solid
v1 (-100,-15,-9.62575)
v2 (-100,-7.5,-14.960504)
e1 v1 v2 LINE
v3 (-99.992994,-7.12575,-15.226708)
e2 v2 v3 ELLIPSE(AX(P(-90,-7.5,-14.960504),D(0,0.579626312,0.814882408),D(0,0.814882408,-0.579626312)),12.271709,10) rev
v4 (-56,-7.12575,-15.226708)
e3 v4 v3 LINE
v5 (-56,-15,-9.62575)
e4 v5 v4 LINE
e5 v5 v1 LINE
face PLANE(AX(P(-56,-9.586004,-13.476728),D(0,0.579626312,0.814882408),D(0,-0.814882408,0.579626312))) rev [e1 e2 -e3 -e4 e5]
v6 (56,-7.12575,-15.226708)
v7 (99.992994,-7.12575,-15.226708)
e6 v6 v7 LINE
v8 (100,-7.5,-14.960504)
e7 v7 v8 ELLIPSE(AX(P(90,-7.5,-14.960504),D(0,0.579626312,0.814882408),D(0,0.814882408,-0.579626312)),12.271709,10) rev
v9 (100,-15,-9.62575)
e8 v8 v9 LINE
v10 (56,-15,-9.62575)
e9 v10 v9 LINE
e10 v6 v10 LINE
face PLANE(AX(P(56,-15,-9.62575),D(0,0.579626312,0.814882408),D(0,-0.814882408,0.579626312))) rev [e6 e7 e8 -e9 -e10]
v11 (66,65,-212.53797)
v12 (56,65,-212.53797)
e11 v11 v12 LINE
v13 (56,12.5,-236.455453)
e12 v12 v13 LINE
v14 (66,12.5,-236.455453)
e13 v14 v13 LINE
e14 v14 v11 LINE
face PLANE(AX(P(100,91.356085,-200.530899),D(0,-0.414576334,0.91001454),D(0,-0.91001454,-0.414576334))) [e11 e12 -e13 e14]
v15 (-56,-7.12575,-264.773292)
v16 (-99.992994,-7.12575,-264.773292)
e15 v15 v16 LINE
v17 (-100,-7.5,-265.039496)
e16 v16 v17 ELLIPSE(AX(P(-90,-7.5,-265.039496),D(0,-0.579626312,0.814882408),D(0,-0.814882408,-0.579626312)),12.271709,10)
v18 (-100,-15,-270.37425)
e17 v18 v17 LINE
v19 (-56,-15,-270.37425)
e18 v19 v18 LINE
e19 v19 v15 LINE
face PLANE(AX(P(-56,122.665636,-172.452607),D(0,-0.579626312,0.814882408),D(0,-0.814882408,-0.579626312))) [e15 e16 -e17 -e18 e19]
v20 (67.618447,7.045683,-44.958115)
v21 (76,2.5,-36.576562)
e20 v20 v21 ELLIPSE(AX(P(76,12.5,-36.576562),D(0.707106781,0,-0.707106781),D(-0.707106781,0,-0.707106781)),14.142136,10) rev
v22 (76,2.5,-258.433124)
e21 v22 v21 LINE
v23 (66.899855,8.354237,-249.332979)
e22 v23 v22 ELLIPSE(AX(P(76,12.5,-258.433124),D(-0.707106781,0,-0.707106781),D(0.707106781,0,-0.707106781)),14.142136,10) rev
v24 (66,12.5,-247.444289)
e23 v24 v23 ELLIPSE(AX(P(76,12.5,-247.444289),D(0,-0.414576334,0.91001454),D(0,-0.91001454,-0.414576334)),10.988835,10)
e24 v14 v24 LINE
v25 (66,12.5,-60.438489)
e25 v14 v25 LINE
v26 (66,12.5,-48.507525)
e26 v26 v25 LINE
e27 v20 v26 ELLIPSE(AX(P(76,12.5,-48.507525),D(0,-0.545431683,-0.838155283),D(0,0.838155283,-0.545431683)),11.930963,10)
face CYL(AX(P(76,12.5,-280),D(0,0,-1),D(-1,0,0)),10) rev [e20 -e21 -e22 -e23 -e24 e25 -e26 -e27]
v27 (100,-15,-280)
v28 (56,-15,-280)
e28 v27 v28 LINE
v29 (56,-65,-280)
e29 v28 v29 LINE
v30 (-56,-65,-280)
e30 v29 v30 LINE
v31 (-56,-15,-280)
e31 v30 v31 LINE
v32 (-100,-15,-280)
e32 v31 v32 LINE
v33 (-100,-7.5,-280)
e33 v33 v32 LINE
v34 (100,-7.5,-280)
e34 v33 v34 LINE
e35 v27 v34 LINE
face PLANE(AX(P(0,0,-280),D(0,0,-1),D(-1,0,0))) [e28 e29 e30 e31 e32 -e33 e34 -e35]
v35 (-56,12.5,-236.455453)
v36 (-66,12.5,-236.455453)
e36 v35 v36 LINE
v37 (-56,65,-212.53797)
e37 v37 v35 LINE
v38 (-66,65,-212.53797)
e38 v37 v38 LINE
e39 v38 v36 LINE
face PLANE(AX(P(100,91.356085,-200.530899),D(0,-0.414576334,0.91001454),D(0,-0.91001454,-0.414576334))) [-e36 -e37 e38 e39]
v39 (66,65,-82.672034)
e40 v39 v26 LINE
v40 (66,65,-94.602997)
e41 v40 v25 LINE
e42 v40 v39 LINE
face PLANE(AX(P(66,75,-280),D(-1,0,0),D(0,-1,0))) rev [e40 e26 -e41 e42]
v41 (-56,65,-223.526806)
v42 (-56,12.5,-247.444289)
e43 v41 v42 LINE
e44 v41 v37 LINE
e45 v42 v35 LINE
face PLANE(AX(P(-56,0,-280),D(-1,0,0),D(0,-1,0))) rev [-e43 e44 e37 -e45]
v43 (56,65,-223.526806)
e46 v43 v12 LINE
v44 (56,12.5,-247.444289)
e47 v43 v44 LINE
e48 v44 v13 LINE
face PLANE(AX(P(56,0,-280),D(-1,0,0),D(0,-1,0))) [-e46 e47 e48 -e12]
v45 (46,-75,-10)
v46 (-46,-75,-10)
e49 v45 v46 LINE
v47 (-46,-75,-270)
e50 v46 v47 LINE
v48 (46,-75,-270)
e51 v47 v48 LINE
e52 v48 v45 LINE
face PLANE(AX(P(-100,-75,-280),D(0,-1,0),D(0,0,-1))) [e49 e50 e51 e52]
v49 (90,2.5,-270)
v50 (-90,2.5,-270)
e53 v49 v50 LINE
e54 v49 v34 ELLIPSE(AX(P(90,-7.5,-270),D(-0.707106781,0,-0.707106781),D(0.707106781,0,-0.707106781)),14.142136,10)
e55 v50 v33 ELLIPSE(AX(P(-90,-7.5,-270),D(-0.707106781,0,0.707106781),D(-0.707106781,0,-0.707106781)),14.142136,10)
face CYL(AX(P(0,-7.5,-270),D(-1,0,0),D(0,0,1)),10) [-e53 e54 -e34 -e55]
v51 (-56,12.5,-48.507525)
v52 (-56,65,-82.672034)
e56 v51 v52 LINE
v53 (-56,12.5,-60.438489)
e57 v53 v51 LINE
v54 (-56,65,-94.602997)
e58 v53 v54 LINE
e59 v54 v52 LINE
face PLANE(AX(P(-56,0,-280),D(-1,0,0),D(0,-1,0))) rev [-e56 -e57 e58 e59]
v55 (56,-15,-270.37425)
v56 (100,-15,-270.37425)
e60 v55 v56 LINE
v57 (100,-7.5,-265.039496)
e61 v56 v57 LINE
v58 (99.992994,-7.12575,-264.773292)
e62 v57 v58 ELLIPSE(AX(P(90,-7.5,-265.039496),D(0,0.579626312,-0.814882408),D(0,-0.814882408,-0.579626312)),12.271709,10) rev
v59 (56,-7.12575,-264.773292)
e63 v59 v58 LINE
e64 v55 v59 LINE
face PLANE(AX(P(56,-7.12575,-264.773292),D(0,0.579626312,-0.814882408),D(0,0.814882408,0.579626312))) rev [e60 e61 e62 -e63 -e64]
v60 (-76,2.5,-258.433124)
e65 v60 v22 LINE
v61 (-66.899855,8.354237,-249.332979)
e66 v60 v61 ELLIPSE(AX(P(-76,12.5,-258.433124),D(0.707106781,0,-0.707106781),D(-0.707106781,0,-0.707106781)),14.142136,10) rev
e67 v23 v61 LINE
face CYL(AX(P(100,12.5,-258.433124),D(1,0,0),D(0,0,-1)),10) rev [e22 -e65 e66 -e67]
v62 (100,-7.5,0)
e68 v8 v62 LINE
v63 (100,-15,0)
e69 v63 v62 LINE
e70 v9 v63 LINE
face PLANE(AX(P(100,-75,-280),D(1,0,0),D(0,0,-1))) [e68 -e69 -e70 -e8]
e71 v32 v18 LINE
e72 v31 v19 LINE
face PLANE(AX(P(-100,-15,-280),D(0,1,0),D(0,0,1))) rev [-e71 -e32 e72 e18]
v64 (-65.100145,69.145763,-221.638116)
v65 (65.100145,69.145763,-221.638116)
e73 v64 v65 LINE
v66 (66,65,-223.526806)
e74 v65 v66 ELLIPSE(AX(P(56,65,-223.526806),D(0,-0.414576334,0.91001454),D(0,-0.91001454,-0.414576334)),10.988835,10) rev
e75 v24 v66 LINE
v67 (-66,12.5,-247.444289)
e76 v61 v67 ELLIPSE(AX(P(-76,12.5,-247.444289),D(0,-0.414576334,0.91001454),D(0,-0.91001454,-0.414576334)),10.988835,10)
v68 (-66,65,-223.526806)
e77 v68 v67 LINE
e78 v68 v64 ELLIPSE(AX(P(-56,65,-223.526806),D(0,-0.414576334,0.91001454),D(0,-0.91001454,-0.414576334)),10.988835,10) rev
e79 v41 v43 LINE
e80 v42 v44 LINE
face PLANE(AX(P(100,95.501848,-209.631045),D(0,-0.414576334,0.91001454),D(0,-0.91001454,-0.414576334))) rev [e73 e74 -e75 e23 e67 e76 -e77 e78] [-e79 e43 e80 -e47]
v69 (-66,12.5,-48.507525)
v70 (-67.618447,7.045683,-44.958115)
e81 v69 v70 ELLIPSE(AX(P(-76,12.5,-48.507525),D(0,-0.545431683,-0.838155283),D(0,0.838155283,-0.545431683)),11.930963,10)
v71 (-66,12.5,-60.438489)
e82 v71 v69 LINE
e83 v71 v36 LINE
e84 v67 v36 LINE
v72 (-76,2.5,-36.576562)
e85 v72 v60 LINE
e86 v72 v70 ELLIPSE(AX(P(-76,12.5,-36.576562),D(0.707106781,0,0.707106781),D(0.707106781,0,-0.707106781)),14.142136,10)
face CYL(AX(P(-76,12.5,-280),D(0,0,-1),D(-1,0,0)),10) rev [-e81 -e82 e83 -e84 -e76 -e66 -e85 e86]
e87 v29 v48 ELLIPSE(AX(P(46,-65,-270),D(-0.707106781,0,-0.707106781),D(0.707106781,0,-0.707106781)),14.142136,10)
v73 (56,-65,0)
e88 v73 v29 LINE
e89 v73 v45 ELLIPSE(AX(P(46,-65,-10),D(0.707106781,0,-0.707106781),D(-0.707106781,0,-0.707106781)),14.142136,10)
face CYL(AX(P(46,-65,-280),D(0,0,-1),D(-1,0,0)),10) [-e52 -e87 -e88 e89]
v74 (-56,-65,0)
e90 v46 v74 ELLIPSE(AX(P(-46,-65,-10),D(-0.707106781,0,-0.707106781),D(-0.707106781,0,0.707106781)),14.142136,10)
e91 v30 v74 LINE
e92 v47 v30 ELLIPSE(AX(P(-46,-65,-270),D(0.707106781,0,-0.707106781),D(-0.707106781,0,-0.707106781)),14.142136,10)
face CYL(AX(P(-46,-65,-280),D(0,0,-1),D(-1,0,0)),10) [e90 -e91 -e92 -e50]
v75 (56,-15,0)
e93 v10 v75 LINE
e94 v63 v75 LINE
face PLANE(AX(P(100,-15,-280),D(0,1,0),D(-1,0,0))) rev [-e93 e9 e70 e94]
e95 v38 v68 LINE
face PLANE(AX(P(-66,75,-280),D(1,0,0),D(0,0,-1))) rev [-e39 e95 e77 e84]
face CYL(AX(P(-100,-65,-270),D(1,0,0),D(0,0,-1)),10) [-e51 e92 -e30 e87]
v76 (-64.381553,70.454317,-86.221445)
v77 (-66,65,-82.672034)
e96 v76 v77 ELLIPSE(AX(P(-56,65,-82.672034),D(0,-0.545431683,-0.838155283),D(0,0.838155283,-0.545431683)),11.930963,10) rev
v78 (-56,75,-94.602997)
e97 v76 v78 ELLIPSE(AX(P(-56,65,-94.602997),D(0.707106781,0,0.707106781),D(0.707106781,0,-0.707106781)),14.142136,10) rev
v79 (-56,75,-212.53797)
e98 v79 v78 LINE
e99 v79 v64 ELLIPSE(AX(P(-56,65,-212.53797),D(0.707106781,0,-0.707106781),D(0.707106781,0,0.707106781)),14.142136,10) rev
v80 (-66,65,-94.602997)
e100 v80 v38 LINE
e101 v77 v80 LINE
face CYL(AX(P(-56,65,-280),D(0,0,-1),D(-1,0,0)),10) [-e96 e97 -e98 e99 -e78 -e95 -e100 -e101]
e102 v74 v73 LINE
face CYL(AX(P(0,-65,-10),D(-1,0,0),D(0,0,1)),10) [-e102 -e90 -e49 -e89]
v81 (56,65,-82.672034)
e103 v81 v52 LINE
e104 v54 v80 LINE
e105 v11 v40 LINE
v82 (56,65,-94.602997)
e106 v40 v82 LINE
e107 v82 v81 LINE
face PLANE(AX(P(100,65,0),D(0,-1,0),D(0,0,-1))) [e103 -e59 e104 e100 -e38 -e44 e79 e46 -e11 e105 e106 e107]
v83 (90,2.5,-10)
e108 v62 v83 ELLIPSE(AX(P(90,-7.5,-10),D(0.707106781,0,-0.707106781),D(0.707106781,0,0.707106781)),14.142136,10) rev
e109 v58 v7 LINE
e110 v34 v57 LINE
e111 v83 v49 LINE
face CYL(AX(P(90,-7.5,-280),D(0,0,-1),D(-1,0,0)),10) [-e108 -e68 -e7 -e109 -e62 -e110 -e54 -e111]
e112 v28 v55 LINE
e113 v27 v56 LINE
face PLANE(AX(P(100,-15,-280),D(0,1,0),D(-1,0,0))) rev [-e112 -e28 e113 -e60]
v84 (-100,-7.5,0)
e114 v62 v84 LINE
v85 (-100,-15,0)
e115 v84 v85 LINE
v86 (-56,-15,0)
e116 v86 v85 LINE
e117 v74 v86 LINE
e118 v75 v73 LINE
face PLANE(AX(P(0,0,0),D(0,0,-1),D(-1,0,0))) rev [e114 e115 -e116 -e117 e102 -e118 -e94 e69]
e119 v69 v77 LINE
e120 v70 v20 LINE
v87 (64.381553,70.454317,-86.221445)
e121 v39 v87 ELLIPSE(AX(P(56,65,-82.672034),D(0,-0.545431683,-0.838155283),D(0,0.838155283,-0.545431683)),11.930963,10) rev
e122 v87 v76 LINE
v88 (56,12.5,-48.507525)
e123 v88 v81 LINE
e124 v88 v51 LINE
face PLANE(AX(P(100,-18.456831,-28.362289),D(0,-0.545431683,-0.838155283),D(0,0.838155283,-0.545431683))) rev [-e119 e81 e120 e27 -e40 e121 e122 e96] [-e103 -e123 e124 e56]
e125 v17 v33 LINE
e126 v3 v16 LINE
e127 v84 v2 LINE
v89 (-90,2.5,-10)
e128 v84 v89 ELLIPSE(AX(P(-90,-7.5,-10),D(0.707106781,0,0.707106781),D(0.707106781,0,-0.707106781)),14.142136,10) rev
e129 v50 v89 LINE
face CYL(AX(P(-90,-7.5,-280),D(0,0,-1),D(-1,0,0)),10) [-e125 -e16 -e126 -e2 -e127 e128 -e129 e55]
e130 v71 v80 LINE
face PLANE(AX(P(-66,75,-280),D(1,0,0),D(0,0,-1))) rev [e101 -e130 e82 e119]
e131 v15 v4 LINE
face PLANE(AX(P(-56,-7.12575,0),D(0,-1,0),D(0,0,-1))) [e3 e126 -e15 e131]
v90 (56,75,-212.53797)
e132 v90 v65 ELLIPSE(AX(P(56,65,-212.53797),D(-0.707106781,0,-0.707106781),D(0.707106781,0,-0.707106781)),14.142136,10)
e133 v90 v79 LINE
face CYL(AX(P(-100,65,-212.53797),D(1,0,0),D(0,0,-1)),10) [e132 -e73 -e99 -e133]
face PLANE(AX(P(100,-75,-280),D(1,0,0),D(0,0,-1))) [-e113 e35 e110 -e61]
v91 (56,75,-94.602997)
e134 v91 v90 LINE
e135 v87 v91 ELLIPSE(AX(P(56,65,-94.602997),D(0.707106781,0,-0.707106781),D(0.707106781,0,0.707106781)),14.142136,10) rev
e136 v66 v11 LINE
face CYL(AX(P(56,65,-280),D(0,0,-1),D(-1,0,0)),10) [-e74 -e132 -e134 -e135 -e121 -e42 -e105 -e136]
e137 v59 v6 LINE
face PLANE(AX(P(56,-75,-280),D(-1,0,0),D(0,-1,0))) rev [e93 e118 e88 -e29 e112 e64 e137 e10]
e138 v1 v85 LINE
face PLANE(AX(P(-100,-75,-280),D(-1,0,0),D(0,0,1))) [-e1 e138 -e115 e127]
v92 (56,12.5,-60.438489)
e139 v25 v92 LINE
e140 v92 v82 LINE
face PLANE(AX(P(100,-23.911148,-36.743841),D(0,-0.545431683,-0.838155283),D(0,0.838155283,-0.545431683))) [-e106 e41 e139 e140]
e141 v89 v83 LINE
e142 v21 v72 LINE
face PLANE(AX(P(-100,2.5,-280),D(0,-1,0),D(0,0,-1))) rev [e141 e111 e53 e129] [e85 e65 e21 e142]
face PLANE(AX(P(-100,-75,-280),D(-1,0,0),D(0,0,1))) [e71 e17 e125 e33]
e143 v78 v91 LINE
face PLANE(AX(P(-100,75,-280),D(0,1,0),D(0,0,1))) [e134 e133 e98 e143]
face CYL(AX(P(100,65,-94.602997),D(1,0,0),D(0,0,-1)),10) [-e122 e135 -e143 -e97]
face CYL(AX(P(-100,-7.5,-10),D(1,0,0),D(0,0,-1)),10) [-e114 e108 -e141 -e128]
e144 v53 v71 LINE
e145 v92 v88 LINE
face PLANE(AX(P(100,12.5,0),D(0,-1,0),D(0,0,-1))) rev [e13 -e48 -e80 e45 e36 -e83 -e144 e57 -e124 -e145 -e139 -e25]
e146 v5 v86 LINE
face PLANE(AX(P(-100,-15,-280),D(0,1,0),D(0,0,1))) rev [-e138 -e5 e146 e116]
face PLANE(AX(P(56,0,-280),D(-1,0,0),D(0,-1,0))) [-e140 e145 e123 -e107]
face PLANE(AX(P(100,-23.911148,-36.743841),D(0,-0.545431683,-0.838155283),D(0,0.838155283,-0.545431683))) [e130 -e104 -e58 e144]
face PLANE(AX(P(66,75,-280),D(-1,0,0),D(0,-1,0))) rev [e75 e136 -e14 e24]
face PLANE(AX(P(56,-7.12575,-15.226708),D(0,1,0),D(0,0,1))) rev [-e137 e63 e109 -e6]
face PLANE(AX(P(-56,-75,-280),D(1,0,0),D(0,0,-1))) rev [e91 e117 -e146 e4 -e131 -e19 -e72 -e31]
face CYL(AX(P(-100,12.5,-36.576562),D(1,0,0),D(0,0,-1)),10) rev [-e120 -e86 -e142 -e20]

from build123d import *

# Parameters (mm, degrees)
SKETCH1_W           = 200
SKETCH1_H           = 150
BOSS_EXTRUDE1_DEPTH = 280
SKETCH2_W           = 44
SKETCH2_H           = 60
SKETCH2_W_2         = 34
SKETCH2_H_2         = 72.5
CUT_EXTRUDE1_DEPTH  = 280
CUT_EXTRUDE5_DEPTH  = 200
CUT_EXTRUDE8_DEPTH  = 44
CUT_EXTRUDE9_DEPTH  = 44
SKETCH6_W           = 112
SKETCH6_H           = 52.5
CUT_EXTRUDE7_DEPTH  = 280
FILLET1_START       = -100
FILLET1_DEPTH       = 200
FILLET1_START_2     = -76
FILLET1_2_DEPTH     = 10
FILLET1_START_3     = 66
FILLET1_3_DEPTH     = 10
FILLET1_START_4     = -66
FILLET1_4_DEPTH     = 132
FILLET1_START_5     = -281
FILLET1_5_DEPTH     = 282


with BuildPart() as part:
    # Sketch1 → Boss-Extrude1 (new body)
    with BuildSketch(Plane.XY):
        Rectangle(SKETCH1_W, SKETCH1_H)
    extrude(amount=-BOSS_EXTRUDE1_DEPTH)

    # Sketch2 → Cut-Extrude1 (cut)
    with BuildSketch(Plane.XY):
        with Locations((78, -45)):
            Rectangle(SKETCH2_W, SKETCH2_H)
        with Locations((-78, -45)):
            Rectangle(SKETCH2_W, SKETCH2_H)
        with Locations((83, 38.75)):
            Rectangle(SKETCH2_W_2, SKETCH2_H_2)
        with Locations((-83, 38.75)):
            Rectangle(SKETCH2_W_2, SKETCH2_H_2)
    extrude(amount=-CUT_EXTRUDE1_DEPTH, mode=Mode.SUBTRACT)

    # Sketch3 → Cut-Extrude5 (cut)
    with BuildSketch(Plane.ZY.offset(100)):
        Polygon((-280, 2.5), (-274.399041425, 2.5), (-252, 2.5), (-218.971094498, 75), (-280, 75), align=None)
        Polygon((-236.455453487, 12.5), (-168.766953205, 12.5), (-60.438488841, 12.5), (-94.602997447, 65), (-144.84946991, 65), (-212.537970192, 65), align=None)
        Polygon((-89.179559504, 75), (-42, 2.5), (-5.600958575, 2.5), (0, 2.5), (0, 75), align=None)
    extrude(amount=-CUT_EXTRUDE5_DEPTH, mode=Mode.SUBTRACT)

    # Sketch5 → Cut-Extrude8 (cut)
    with BuildSketch(Plane.ZY.offset(100)):
        Polygon((-264.773291637, -7.125749789), (-270.374250211, -15), (-140, -15), (-140, -7.125749789), align=None)
        Polygon((-15.226708363, -7.125749789), (-140, -7.125749789), (-140, -15), (-9.625749789, -15), align=None)
    extrude(amount=-CUT_EXTRUDE8_DEPTH, mode=Mode.SUBTRACT)

    # Sketch7 → Cut-Extrude9 (cut)
    with BuildSketch(Plane(origin=(100, 0, 0), x_dir=(0, 0, -1), z_dir=(1, 0, 0))):
        Polygon((9.625749789, -15), (15.226708363, -7.125749789), (264.773291637, -7.125749789), (270.374250211, -15), align=None)
    extrude(amount=-CUT_EXTRUDE9_DEPTH, mode=Mode.SUBTRACT)

    # Sketch6 → Cut-Extrude7 (cut)
    with BuildSketch(Plane.XY):
        with Locations((0, 38.75)):
            Rectangle(SKETCH6_W, SKETCH6_H)
    extrude(amount=-CUT_EXTRUDE7_DEPTH, mode=Mode.SUBTRACT)

    # Fillet1: read off the stored shape, not the designer's step
    # Fillet1 outline → Fillet1 (cut)
    with BuildSketch(Plane.YZ.offset(FILLET1_START)):
        with BuildLine():
            Line((-75, 0), (-75, -10))
            ThreePointArc((-75, -10), (-72.071067812, -2.928932188), (-65, 0))
            Line((-65, 0), (-75, 0))
        make_face()
        with BuildLine():
            ThreePointArc((-65, -280), (-72.071067812, -277.071067812), (-75, -270))
            Line((-75, -270), (-75, -280))
            Line((-75, -280), (-65, -280))
        make_face()
        with BuildLine():
            Line((2.5, 0), (-7.5, 0))
            ThreePointArc((-7.5, 0), (-0.428932188, -2.928932188), (2.5, -10))
            Line((2.5, -10), (2.5, 0))
        make_face()
        with BuildLine():
            ThreePointArc((2.5, -270), (-0.428932188, -277.071067812), (-7.5, -280))
            Line((-7.5, -280), (2.5, -280))
            Line((2.5, -280), (2.5, -270))
        make_face()
        with BuildLine():
            Line((75, -89.179559504), (70.454316835, -86.221444616))
            ThreePointArc((70.454316835, -86.221444616), (73.790425711, -89.835564613), (75, -94.602997447))
            Line((75, -94.602997447), (75, -89.179559504))
        make_face()
        with BuildLine():
            ThreePointArc((75, -212.537970192), (73.410042611, -217.948255145), (69.145763344, -221.638115591))
            Line((69.145763344, -221.638115591), (75, -218.971094498))
            Line((75, -218.971094498), (75, -212.537970192))
        make_face()
    extrude(amount=FILLET1_DEPTH, mode=Mode.SUBTRACT)

    # Fillet1 2 outline → Fillet1 2 (add)
    with BuildSketch(Plane.YZ.offset(FILLET1_START_2)):
        with BuildLine():
            ThreePointArc((7.045683165, -44.958114888), (3.709574289, -41.343994891), (2.5, -36.576562057))
            Line((2.5, -36.576562057), (2.5, -258.433124306))
            ThreePointArc((2.5, -258.433124306), (4.089957389, -253.022839352), (8.354236656, -249.332978906))
            Line((8.354236656, -249.332978906), (69.145763344, -221.638115591))
            ThreePointArc((69.145763344, -221.638115591), (73.410042611, -217.948255145), (75, -212.537970192))
            Line((75, -212.537970192), (75, -94.602997447))
            ThreePointArc((75, -94.602997447), (73.790425711, -89.835564613), (70.454316835, -86.221444616))
            Line((70.454316835, -86.221444616), (7.045683165, -44.958114888))
        make_face()
    extrude(amount=FILLET1_2_DEPTH)

    # Fillet1 3 outline → Fillet1 3 (add)
    with BuildSketch(Plane.YZ.offset(FILLET1_START_3)):
        with BuildLine():
            ThreePointArc((7.045683165, -44.958114888), (3.709574289, -41.343994891), (2.5, -36.576562057))
            Line((2.5, -36.576562057), (2.5, -258.433124306))
            ThreePointArc((2.5, -258.433124306), (4.089957389, -253.022839352), (8.354236656, -249.332978906))
            Line((8.354236656, -249.332978906), (69.145763344, -221.638115591))
            ThreePointArc((69.145763344, -221.638115591), (73.410042611, -217.948255145), (75, -212.537970192))
            Line((75, -212.537970192), (75, -94.602997447))
            ThreePointArc((75, -94.602997447), (73.790425711, -89.835564613), (70.454316835, -86.221444616))
            Line((70.454316835, -86.221444616), (7.045683165, -44.958114888))
        make_face()
    extrude(amount=FILLET1_3_DEPTH)

    # Fillet1 4 outline → Fillet1 4 (add)
    with BuildSketch(Plane.YZ.offset(FILLET1_START_4)):
        with BuildLine():
            ThreePointArc((7.045683165, -44.958114888), (3.709574289, -41.343994891), (2.5, -36.576562057))
            Line((2.5, -36.576562057), (2.5, -42))
            Line((2.5, -42), (7.045683165, -44.958114888))
        make_face()
        with BuildLine():
            Line((2.5, -252), (2.5, -258.433124306))
            ThreePointArc((2.5, -258.433124306), (4.089957389, -253.022839352), (8.354236656, -249.332978906))
            Line((8.354236656, -249.332978906), (2.5, -252))
        make_face()
    extrude(amount=FILLET1_4_DEPTH)

    # Fillet1 5 outline → Fillet1 5 (cut)
    with BuildSketch(Plane.XY.offset(FILLET1_START_5)):
        with BuildLine():
            ThreePointArc((56, 75), (63.071067812, 72.071067812), (66, 65))
            Line((66, 65), (66, 12.5))
            ThreePointArc((66, 12.5), (68.928932188, 5.428932188), (76, 2.5))
            Line((76, 2.5), (76, 75))
            Line((76, 75), (56, 75))
        make_face()
        with BuildLine():
            ThreePointArc((-66, 65), (-63.071067812, 72.071067812), (-56, 75))
            Line((-56, 75), (-76, 75))
            Line((-76, 75), (-76, 2.5))
            ThreePointArc((-76, 2.5), (-68.928932188, 5.428932188), (-66, 12.5))
            Line((-66, 12.5), (-66, 65))
        make_face()
        with BuildLine():
            Line((100, 2.5), (90, 2.5))
            ThreePointArc((90, 2.5), (97.071067812, -0.428932188), (100, -7.5))
            Line((100, -7.5), (100, 2.5))
        make_face()
        with BuildLine():
            Line((-90, 2.5), (-100, 2.5))
            Line((-100, 2.5), (-100, -7.5))
            ThreePointArc((-100, -7.5), (-97.071067812, -0.428932188), (-90, 2.5))
        make_face()
        with BuildLine():
            Line((56, -75), (56, -65))
            ThreePointArc((56, -65), (53.071067812, -72.071067812), (46, -75))
            Line((46, -75), (56, -75))
        make_face()
        with BuildLine():
            ThreePointArc((-46, -75), (-53.071067812, -72.071067812), (-56, -65))
            Line((-56, -65), (-56, -75))
            Line((-56, -75), (-46, -75))
        make_face()
    extrude(amount=FILLET1_5_DEPTH, mode=Mode.SUBTRACT)


solid = part.part
